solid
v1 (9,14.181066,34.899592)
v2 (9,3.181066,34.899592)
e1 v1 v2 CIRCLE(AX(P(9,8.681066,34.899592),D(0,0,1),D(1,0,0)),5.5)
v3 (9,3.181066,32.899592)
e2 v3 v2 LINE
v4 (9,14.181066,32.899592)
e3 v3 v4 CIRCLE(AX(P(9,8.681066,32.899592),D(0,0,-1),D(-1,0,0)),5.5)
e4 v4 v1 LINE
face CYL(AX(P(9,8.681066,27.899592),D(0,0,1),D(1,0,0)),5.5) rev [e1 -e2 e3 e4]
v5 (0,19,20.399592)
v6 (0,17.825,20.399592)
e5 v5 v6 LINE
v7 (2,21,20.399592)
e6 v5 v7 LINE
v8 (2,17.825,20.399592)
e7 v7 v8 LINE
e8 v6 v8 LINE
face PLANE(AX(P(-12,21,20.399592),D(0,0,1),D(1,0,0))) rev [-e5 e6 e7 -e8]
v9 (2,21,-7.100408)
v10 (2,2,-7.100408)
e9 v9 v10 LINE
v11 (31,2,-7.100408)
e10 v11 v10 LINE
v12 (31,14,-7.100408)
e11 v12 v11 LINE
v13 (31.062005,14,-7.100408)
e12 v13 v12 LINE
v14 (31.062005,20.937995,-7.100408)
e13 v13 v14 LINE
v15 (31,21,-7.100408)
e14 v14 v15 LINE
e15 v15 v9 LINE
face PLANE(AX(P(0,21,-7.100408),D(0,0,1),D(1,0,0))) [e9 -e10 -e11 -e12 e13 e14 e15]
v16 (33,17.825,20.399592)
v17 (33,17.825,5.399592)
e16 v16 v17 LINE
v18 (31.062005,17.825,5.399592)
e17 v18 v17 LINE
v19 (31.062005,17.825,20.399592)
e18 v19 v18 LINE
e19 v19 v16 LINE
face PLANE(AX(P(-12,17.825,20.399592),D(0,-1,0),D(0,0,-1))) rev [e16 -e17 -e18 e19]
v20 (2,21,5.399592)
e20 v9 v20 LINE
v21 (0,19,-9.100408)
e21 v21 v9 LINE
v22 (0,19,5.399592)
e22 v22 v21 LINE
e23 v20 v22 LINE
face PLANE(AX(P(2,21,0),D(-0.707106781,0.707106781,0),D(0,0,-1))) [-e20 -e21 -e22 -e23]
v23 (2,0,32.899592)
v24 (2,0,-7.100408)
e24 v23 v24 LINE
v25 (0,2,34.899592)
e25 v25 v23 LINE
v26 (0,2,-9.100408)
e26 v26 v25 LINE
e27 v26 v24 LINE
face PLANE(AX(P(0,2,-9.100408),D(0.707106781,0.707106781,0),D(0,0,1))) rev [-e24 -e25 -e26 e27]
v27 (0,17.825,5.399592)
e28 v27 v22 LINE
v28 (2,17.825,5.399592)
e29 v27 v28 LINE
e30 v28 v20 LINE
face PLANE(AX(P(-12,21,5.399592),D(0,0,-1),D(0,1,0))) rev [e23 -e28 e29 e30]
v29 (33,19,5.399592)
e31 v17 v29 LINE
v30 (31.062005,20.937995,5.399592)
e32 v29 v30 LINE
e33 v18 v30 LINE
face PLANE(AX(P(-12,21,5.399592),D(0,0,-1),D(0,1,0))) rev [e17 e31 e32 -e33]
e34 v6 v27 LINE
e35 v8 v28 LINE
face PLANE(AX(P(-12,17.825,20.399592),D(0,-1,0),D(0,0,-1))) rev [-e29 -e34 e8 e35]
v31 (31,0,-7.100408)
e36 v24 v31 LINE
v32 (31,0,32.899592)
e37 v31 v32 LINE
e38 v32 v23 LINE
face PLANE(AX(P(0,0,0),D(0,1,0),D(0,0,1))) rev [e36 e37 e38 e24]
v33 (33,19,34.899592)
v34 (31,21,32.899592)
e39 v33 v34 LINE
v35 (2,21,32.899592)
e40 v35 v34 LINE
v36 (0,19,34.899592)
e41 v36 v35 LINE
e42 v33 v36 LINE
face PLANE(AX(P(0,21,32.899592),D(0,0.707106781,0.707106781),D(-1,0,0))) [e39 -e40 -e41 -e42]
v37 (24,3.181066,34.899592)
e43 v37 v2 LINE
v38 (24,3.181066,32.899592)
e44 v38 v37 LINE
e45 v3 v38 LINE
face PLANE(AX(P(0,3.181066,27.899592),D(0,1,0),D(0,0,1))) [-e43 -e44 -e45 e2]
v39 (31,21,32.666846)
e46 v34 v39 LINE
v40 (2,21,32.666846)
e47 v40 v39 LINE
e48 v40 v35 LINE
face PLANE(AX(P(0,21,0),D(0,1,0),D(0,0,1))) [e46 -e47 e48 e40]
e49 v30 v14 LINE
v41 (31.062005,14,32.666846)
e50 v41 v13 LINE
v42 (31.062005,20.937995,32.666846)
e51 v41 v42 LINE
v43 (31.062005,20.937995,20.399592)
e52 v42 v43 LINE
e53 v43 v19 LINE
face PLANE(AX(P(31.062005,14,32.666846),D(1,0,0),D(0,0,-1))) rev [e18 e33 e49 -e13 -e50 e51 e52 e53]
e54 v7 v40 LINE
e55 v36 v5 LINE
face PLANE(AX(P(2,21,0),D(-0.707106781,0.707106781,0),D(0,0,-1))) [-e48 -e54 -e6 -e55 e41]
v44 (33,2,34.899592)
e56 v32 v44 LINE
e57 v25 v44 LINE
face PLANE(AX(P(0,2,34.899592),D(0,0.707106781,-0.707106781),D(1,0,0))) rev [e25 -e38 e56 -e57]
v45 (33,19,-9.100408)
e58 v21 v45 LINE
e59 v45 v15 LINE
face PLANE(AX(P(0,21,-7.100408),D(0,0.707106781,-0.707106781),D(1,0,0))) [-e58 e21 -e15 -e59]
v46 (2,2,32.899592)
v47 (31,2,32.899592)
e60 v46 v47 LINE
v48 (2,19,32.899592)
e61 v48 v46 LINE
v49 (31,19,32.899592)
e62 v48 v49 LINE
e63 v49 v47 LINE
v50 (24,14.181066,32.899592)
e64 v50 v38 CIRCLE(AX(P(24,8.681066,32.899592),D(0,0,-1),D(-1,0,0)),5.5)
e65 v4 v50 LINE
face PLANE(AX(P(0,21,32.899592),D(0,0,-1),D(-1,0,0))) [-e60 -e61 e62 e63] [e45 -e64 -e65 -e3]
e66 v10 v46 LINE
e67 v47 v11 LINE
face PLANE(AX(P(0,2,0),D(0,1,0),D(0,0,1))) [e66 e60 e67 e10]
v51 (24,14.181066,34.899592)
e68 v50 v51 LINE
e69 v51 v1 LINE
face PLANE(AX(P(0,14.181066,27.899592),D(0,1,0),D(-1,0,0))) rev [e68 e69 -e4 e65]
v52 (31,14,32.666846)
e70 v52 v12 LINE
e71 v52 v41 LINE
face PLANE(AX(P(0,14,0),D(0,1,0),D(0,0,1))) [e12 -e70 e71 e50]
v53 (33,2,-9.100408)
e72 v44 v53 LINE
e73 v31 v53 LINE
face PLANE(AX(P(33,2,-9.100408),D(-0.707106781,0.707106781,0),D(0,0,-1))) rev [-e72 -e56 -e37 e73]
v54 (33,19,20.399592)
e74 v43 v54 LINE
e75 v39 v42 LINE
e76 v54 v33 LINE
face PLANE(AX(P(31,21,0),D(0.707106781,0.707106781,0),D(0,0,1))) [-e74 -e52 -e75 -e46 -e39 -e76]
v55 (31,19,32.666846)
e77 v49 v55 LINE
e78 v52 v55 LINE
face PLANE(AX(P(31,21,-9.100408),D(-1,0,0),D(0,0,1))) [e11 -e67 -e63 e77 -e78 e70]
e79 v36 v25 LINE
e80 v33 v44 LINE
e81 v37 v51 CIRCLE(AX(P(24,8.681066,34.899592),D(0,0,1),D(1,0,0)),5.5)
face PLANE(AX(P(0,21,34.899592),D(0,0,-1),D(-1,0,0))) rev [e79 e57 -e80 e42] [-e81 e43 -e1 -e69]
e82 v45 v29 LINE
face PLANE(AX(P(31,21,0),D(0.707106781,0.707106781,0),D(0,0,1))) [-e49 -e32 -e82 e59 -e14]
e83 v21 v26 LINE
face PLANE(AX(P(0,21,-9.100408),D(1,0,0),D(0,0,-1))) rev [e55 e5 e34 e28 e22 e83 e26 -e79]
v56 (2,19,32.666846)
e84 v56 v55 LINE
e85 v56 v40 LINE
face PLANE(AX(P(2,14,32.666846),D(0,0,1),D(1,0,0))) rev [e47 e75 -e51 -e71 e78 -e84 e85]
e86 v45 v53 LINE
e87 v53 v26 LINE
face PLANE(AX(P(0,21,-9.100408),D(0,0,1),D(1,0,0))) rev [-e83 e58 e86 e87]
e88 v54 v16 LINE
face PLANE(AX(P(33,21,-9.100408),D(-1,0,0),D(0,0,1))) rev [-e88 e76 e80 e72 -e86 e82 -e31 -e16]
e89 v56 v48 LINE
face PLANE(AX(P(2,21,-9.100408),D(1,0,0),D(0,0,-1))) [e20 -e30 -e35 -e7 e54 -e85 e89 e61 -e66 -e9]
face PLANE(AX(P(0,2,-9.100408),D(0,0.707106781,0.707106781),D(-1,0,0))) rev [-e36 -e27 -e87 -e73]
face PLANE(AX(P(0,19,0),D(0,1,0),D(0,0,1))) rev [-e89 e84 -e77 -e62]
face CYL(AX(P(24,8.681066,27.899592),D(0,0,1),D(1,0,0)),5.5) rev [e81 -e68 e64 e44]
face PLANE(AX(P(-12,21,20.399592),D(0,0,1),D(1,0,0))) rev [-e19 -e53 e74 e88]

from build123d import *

# Parameters (mm, degrees)
SKETCH1_W           = 33
SKETCH1_H           = 44
BOSS_EXTRUDE1_DEPTH = 21
SHELL1_START        = 2
SHELL1_OUTLINE_W    = 17
SHELL1_OUTLINE_H    = 40
SHELL1_DEPTH        = 29
SKETCH2_W           = 29.062005015
SKETCH2_H           = 39.767253615
CUT_EXTRUDE1_DEPTH  = 7
CUT_EXTRUDE2_DEPTH  = 7
SKETCH4_W           = 15
SKETCH4_H           = 3.175
CUT_EXTRUDE3_DEPTH  = 45
CHAMFER1_SIZE       = 2


# Read off the part's stored shape, not the designer's step: Shell1
with BuildPart() as part:
    # Sketch1 → Boss-Extrude1 (new body)
    with BuildSketch(Plane(origin=(0, 0, 0), x_dir=(1, 0, 0), z_dir=(0, 1, 0))):
        with Locations((16.5, -12.899591929)):
            Rectangle(SKETCH1_W, SKETCH1_H)
    extrude(amount=BOSS_EXTRUDE1_DEPTH)

    # Shell1 outline → Shell1 (cut)
    with BuildSketch(Plane.YZ.offset(SHELL1_START)):
        with Locations((10.5, 12.899591929)):
            Rectangle(SHELL1_OUTLINE_W, SHELL1_OUTLINE_H)
    extrude(amount=SHELL1_DEPTH, mode=Mode.SUBTRACT)

    # Sketch2 → Cut-Extrude1 (cut)
    with BuildSketch(Plane(origin=(0, 21, 0), x_dir=(1, 0, 0), z_dir=(0, 1, 0))):
        with Locations((16.531002507, -12.783218737)):
            Rectangle(SKETCH2_W, SKETCH2_H)
    extrude(amount=-CUT_EXTRUDE1_DEPTH, mode=Mode.SUBTRACT)

    # Sketch3 → Cut-Extrude2 (cut)
    with BuildSketch(Plane.XY.offset(34.899591929)):
        with BuildLine():
            ThreePointArc((14.5, 8.681065769), (12.889087297, 12.570153065), (9, 14.181065769))
            Line((9, 14.181065769), (9, 3.181065769))
            ThreePointArc((9, 3.181065769), (12.889087297, 4.791978472), (14.5, 8.681065769))
        make_face()
        with BuildLine():
            Line((9, 3.181065769), (9, 14.181065769))
            ThreePointArc((9, 14.181065769), (3.5, 8.681065769), (9, 3.181065769))
        make_face()
        with BuildLine():
            Line((16.5, 3.181065769), (16.5, 14.181065769))
            Line((16.5, 14.181065769), (9, 14.181065769))
            ThreePointArc((9, 14.181065769), (12.889087297, 12.570153065), (14.5, 8.681065769))
            ThreePointArc((14.5, 8.681065769), (12.889087297, 4.791978472), (9, 3.181065769))
            Line((9, 3.181065769), (16.5, 3.181065769))
        make_face()
        with BuildLine():
            ThreePointArc((24, 3.181065769), (18.5, 8.681065769), (24, 14.181065769))
            Line((24, 14.181065769), (16.5, 14.181065769))
            Line((16.5, 14.181065769), (16.5, 3.181065769))
            Line((16.5, 3.181065769), (24, 3.181065769))
        make_face()
        with BuildLine():
            ThreePointArc((29.5, 8.681065769), (27.889087297, 12.570153065), (24, 14.181065769))
            Line((24, 14.181065769), (24, 3.181065769))
            ThreePointArc((24, 3.181065769), (27.889087297, 4.791978472), (29.5, 8.681065769))
        make_face()
        with BuildLine():
            Line((24, 3.181065769), (24, 14.181065769))
            ThreePointArc((24, 14.181065769), (18.5, 8.681065769), (24, 3.181065769))
        make_face()
    extrude(amount=-CUT_EXTRUDE2_DEPTH, mode=Mode.SUBTRACT)

    # Sketch4 → Cut-Extrude3 (cut)
    with BuildSketch(Plane(origin=(33, 0, 0), x_dir=(0, 0, -1), z_dir=(1, 0, 0))):
        with Locations((-12.899591929, 19.4125)):
            Rectangle(SKETCH4_W, SKETCH4_H)
    extrude(amount=-CUT_EXTRUDE3_DEPTH, mode=Mode.SUBTRACT)

    # Chamfer1
    chamfer1_edges = [part.edges().sort_by_distance(p)[0] for p in [
        (16.5, 0, 34.899591929),
        (33, 0, 12.899591929),
        (16.5, 0, -9.100408071),
        (0, 0, 12.899591929),
        (33, 21, -1.850408071),
        (16.5, 21, -9.100408071),
        (0, 21, -1.850408071),
        (0, 21, 27.649591929),
        (16.5, 21, 34.899591929),
        (33, 21, 27.649591929),
    ]]
    chamfer(chamfer1_edges, length=CHAMFER1_SIZE - 0.0001)  # a hair under: the kernel refuses the full size


solid = part.part
